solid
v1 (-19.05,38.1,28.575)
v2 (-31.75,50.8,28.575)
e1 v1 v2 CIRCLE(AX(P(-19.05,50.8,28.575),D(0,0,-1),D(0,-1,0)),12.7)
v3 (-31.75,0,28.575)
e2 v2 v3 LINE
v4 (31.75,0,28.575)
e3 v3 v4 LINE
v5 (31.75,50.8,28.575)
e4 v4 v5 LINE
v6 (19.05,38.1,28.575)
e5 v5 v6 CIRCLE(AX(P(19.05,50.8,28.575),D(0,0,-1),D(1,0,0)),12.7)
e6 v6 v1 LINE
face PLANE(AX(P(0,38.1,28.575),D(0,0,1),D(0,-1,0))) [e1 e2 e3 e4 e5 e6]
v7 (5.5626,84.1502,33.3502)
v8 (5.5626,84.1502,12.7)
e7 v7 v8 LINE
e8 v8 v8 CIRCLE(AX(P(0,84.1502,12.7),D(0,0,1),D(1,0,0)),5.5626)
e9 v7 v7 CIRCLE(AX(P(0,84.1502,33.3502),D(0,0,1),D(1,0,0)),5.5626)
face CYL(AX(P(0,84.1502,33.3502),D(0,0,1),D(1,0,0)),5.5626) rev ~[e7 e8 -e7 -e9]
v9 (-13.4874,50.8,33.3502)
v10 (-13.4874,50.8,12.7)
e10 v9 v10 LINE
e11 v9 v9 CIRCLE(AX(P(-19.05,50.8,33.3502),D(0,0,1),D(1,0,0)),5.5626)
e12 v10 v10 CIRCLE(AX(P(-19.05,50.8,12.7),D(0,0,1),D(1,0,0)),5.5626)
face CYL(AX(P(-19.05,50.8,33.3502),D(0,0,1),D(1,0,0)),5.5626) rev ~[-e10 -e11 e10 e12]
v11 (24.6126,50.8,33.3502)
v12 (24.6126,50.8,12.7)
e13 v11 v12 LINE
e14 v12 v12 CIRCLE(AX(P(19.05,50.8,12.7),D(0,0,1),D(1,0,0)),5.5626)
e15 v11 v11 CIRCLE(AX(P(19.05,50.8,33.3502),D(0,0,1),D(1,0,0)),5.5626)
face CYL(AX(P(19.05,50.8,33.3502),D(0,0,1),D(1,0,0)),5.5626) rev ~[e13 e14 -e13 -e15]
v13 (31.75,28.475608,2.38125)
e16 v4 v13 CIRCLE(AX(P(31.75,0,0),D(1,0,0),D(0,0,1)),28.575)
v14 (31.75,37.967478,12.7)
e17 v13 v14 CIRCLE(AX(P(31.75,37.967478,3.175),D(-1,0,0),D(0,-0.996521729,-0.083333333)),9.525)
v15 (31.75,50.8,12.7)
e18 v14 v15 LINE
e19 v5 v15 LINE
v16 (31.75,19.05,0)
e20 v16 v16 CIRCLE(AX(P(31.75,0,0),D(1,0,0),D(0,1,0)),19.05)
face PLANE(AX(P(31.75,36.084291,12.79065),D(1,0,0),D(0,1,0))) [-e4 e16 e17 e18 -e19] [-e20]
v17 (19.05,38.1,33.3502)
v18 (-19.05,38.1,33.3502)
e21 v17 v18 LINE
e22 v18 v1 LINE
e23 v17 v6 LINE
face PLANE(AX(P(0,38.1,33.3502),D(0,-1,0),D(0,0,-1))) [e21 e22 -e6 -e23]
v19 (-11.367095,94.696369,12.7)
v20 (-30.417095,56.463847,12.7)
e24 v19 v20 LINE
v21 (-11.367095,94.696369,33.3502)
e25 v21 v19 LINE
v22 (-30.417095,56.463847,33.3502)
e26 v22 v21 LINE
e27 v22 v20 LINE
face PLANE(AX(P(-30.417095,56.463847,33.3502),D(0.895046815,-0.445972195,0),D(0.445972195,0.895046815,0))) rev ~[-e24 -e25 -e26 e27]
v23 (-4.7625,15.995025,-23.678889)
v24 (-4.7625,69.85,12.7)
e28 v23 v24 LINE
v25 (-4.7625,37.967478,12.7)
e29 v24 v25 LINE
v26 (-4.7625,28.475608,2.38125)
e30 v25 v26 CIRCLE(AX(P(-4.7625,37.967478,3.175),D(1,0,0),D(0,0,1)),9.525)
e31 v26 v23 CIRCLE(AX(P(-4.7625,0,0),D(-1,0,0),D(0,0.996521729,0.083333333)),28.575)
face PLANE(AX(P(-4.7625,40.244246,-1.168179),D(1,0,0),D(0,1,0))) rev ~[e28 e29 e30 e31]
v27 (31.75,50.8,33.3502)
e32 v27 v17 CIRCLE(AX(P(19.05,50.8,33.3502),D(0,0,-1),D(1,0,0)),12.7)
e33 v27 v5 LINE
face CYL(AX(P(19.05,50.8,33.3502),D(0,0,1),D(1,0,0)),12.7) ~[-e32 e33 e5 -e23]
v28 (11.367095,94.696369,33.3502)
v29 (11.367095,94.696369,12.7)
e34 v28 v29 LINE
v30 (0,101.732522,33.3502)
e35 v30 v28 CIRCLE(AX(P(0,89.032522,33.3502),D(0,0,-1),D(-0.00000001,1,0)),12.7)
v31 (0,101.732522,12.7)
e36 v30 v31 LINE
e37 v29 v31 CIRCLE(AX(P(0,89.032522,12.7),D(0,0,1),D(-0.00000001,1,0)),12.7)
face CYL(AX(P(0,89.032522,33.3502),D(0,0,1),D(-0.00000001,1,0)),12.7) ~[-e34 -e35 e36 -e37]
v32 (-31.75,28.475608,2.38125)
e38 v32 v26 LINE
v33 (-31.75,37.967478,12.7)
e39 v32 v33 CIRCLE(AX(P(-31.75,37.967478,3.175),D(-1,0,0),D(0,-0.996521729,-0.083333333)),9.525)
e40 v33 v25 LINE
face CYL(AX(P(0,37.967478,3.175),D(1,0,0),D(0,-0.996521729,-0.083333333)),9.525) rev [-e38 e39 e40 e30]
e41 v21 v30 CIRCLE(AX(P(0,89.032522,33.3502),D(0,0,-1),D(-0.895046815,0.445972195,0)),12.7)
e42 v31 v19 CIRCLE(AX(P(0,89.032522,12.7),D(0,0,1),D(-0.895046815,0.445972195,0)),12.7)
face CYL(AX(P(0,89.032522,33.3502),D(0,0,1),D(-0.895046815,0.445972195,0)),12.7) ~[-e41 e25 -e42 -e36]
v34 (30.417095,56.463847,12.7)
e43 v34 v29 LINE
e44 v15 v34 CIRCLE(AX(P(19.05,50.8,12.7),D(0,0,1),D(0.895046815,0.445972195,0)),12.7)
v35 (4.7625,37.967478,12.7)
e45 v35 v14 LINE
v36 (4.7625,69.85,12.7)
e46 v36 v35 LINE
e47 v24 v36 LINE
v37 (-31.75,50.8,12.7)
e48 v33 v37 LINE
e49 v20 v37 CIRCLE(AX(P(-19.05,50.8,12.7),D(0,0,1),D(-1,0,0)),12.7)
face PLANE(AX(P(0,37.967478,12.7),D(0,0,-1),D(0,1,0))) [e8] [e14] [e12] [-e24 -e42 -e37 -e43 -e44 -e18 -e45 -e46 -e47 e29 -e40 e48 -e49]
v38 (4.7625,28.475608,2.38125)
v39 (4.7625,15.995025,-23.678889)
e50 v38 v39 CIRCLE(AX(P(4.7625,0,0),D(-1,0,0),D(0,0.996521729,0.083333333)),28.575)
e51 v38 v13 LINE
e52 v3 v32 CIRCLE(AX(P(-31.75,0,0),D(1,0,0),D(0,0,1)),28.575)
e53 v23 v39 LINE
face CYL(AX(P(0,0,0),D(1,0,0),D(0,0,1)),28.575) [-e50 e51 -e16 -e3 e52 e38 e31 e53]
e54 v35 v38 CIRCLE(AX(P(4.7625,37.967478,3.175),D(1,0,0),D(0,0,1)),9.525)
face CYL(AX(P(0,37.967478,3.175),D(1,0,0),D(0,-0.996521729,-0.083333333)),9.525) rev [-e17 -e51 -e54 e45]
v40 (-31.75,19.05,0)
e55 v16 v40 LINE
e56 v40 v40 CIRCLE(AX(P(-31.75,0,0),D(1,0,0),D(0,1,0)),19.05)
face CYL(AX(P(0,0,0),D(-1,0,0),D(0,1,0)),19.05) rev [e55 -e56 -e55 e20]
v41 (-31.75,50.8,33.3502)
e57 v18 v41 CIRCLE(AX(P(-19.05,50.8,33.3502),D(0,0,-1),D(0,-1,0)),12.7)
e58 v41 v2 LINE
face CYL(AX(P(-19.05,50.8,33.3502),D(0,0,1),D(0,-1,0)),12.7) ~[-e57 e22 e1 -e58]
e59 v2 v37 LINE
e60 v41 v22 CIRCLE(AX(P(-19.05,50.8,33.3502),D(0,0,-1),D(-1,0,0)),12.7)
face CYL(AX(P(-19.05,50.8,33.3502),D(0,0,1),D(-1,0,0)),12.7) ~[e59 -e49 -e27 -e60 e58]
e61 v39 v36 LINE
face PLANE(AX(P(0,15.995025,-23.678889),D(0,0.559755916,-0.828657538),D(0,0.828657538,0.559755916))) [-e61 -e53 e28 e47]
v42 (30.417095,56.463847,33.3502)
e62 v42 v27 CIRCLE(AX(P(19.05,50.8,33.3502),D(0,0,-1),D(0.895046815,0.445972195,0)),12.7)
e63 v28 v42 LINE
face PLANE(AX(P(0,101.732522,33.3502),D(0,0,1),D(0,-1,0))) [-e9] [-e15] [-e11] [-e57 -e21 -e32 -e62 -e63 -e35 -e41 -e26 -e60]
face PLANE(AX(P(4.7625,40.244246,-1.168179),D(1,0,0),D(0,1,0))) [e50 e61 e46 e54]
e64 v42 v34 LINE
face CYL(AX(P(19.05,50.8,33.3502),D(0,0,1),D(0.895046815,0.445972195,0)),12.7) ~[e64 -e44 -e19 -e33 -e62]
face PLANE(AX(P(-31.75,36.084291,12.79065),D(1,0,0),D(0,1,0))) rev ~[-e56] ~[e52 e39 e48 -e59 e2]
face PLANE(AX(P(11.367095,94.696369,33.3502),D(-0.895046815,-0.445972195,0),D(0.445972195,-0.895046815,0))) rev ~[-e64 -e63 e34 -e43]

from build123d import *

# Parameters (mm, degrees)
F0_R     = 19.05
F1_DEPTH = 31.75
F3_DEPTH = 43.06758
F4_DEPTH = 25.4
F5_DEPTH = 4.7752
F6_DEPTH = 4.7752
F2_R     = 5.5626
F7_DEPTH = 61.9262
F8_DEPTH = 4.7625


with BuildPart() as f1:
    # F0 (on Right) → F1 (new body, symmetric)
    with BuildSketch(Plane.YZ):
        with BuildLine():
            Line((38.1, 28.575), (0, 28.575))
            ThreePointArc((0, 28.575), (-27.3235693319, -8.3638020041), (15.9950252975, -23.6788891364))
            ThreePointArc((15.9950252975, -23.6788891364), (25.7719232537, -12.3425522809), (28.4756083945, 2.38125))
            ThreePointArc((28.4756083945, 2.38125), (30.9572676717, 9.6234554837), (37.9674778593, 12.7))
            Line((37.9674778593, 12.7), (69.85, 12.7))
            Line((69.85, 12.7), (101.7325221407, 12.7))
            Line((101.7325221407, 12.7), (101.7325221407, 33.3502))
            Line((101.7325221407, 33.3502), (38.1, 33.3502))
            Line((38.1, 33.3502), (38.1, 28.575))
        make_face()
        Circle(F0_R, mode=Mode.SUBTRACT)
    extrude(amount=F1_DEPTH, both=True)

    # F2 (on face) → F3 (cut)
    with BuildSketch(Plane.XY.offset(33.3502)):
        with BuildLine():
            ThreePointArc((30.4170945511, 56.4638468789), (31.4122833813, 53.7092867856), (31.75, 50.8))
            Line((31.75, 50.8), (31.75, 101.7325221407))
            Line((31.75, 101.7325221407), (-1.274e-07, 101.7325221407))
            ThreePointArc((-1.274e-07, 101.7325221407), (6.6842779412, 99.8311529985), (11.3670945511, 94.6963690195))
            Line((11.3670945511, 94.6963690195), (30.4170945511, 56.4638468789))
        make_face()
    extrude(amount=-F3_DEPTH, mode=Mode.SUBTRACT)

    # F2 (on face) → F4 (cut)
    with BuildSketch(Plane.XY.offset(33.3502)):
        with BuildLine():
            Line((-31.75, 101.7325221407), (-31.75, 50.8))
            ThreePointArc((-31.75, 50.8), (-31.4122833813, 53.7092867856), (-30.4170945511, 56.4638468789))
            Line((-30.4170945511, 56.4638468789), (-11.3670945511, 94.6963690195))
            ThreePointArc((-11.3670945511, 94.6963690195), (-6.6842780495, 99.8311529315), (-1.274e-07, 101.7325221407))
            Line((-1.274e-07, 101.7325221407), (-31.75, 101.7325221407))
        make_face()
    extrude(amount=-F4_DEPTH, mode=Mode.SUBTRACT)

    # F2 (on face) → F5 (cut)
    with BuildSketch(Plane.XY.offset(33.3502)):
        with BuildLine():
            Line((-31.75, 38.1), (-19.05, 38.1))
            ThreePointArc((-19.05, 38.1), (-28.0302561211, 41.8197438789), (-31.75, 50.8))
            Line((-31.75, 50.8), (-31.75, 38.1))
        make_face()
    extrude(amount=-F5_DEPTH, mode=Mode.SUBTRACT)

    # F2 (on face) → F6 (cut)
    with BuildSketch(Plane.XY.offset(33.3502)):
        with BuildLine():
            ThreePointArc((31.75, 50.8), (28.0302561211, 41.8197438789), (19.05, 38.1))
            Line((19.05, 38.1), (31.75, 38.1))
            Line((31.75, 38.1), (31.75, 50.8))
        make_face()
    extrude(amount=-F6_DEPTH, mode=Mode.SUBTRACT)

    # F2 (on face) → F7 (cut, through all)
    with BuildSketch(Plane.XY.offset(33.3502)):
        with Locations((-19.05, 50.8)):
            Circle(F2_R)
        with Locations((0, 84.1502)):
            Circle(F2_R)
        with Locations((19.05, 50.8)):
            Circle(F2_R)
    extrude(amount=-F7_DEPTH, mode=Mode.SUBTRACT)

    # F0 (on Right) → F8 (join, symmetric)
    with BuildSketch(Plane.YZ):
        with BuildLine():
            ThreePointArc((28.4756083945, 2.38125), (25.7719232537, -12.3425522809), (15.9950252975, -23.6788891364))
            Line((15.9950252975, -23.6788891364), (69.85, 12.7))
            Line((69.85, 12.7), (37.9674778593, 12.7))
            ThreePointArc((37.9674778593, 12.7), (30.9572676717, 9.6234554837), (28.4756083945, 2.38125))
        make_face()
    extrude(amount=F8_DEPTH, both=True)


solid = f1.part
